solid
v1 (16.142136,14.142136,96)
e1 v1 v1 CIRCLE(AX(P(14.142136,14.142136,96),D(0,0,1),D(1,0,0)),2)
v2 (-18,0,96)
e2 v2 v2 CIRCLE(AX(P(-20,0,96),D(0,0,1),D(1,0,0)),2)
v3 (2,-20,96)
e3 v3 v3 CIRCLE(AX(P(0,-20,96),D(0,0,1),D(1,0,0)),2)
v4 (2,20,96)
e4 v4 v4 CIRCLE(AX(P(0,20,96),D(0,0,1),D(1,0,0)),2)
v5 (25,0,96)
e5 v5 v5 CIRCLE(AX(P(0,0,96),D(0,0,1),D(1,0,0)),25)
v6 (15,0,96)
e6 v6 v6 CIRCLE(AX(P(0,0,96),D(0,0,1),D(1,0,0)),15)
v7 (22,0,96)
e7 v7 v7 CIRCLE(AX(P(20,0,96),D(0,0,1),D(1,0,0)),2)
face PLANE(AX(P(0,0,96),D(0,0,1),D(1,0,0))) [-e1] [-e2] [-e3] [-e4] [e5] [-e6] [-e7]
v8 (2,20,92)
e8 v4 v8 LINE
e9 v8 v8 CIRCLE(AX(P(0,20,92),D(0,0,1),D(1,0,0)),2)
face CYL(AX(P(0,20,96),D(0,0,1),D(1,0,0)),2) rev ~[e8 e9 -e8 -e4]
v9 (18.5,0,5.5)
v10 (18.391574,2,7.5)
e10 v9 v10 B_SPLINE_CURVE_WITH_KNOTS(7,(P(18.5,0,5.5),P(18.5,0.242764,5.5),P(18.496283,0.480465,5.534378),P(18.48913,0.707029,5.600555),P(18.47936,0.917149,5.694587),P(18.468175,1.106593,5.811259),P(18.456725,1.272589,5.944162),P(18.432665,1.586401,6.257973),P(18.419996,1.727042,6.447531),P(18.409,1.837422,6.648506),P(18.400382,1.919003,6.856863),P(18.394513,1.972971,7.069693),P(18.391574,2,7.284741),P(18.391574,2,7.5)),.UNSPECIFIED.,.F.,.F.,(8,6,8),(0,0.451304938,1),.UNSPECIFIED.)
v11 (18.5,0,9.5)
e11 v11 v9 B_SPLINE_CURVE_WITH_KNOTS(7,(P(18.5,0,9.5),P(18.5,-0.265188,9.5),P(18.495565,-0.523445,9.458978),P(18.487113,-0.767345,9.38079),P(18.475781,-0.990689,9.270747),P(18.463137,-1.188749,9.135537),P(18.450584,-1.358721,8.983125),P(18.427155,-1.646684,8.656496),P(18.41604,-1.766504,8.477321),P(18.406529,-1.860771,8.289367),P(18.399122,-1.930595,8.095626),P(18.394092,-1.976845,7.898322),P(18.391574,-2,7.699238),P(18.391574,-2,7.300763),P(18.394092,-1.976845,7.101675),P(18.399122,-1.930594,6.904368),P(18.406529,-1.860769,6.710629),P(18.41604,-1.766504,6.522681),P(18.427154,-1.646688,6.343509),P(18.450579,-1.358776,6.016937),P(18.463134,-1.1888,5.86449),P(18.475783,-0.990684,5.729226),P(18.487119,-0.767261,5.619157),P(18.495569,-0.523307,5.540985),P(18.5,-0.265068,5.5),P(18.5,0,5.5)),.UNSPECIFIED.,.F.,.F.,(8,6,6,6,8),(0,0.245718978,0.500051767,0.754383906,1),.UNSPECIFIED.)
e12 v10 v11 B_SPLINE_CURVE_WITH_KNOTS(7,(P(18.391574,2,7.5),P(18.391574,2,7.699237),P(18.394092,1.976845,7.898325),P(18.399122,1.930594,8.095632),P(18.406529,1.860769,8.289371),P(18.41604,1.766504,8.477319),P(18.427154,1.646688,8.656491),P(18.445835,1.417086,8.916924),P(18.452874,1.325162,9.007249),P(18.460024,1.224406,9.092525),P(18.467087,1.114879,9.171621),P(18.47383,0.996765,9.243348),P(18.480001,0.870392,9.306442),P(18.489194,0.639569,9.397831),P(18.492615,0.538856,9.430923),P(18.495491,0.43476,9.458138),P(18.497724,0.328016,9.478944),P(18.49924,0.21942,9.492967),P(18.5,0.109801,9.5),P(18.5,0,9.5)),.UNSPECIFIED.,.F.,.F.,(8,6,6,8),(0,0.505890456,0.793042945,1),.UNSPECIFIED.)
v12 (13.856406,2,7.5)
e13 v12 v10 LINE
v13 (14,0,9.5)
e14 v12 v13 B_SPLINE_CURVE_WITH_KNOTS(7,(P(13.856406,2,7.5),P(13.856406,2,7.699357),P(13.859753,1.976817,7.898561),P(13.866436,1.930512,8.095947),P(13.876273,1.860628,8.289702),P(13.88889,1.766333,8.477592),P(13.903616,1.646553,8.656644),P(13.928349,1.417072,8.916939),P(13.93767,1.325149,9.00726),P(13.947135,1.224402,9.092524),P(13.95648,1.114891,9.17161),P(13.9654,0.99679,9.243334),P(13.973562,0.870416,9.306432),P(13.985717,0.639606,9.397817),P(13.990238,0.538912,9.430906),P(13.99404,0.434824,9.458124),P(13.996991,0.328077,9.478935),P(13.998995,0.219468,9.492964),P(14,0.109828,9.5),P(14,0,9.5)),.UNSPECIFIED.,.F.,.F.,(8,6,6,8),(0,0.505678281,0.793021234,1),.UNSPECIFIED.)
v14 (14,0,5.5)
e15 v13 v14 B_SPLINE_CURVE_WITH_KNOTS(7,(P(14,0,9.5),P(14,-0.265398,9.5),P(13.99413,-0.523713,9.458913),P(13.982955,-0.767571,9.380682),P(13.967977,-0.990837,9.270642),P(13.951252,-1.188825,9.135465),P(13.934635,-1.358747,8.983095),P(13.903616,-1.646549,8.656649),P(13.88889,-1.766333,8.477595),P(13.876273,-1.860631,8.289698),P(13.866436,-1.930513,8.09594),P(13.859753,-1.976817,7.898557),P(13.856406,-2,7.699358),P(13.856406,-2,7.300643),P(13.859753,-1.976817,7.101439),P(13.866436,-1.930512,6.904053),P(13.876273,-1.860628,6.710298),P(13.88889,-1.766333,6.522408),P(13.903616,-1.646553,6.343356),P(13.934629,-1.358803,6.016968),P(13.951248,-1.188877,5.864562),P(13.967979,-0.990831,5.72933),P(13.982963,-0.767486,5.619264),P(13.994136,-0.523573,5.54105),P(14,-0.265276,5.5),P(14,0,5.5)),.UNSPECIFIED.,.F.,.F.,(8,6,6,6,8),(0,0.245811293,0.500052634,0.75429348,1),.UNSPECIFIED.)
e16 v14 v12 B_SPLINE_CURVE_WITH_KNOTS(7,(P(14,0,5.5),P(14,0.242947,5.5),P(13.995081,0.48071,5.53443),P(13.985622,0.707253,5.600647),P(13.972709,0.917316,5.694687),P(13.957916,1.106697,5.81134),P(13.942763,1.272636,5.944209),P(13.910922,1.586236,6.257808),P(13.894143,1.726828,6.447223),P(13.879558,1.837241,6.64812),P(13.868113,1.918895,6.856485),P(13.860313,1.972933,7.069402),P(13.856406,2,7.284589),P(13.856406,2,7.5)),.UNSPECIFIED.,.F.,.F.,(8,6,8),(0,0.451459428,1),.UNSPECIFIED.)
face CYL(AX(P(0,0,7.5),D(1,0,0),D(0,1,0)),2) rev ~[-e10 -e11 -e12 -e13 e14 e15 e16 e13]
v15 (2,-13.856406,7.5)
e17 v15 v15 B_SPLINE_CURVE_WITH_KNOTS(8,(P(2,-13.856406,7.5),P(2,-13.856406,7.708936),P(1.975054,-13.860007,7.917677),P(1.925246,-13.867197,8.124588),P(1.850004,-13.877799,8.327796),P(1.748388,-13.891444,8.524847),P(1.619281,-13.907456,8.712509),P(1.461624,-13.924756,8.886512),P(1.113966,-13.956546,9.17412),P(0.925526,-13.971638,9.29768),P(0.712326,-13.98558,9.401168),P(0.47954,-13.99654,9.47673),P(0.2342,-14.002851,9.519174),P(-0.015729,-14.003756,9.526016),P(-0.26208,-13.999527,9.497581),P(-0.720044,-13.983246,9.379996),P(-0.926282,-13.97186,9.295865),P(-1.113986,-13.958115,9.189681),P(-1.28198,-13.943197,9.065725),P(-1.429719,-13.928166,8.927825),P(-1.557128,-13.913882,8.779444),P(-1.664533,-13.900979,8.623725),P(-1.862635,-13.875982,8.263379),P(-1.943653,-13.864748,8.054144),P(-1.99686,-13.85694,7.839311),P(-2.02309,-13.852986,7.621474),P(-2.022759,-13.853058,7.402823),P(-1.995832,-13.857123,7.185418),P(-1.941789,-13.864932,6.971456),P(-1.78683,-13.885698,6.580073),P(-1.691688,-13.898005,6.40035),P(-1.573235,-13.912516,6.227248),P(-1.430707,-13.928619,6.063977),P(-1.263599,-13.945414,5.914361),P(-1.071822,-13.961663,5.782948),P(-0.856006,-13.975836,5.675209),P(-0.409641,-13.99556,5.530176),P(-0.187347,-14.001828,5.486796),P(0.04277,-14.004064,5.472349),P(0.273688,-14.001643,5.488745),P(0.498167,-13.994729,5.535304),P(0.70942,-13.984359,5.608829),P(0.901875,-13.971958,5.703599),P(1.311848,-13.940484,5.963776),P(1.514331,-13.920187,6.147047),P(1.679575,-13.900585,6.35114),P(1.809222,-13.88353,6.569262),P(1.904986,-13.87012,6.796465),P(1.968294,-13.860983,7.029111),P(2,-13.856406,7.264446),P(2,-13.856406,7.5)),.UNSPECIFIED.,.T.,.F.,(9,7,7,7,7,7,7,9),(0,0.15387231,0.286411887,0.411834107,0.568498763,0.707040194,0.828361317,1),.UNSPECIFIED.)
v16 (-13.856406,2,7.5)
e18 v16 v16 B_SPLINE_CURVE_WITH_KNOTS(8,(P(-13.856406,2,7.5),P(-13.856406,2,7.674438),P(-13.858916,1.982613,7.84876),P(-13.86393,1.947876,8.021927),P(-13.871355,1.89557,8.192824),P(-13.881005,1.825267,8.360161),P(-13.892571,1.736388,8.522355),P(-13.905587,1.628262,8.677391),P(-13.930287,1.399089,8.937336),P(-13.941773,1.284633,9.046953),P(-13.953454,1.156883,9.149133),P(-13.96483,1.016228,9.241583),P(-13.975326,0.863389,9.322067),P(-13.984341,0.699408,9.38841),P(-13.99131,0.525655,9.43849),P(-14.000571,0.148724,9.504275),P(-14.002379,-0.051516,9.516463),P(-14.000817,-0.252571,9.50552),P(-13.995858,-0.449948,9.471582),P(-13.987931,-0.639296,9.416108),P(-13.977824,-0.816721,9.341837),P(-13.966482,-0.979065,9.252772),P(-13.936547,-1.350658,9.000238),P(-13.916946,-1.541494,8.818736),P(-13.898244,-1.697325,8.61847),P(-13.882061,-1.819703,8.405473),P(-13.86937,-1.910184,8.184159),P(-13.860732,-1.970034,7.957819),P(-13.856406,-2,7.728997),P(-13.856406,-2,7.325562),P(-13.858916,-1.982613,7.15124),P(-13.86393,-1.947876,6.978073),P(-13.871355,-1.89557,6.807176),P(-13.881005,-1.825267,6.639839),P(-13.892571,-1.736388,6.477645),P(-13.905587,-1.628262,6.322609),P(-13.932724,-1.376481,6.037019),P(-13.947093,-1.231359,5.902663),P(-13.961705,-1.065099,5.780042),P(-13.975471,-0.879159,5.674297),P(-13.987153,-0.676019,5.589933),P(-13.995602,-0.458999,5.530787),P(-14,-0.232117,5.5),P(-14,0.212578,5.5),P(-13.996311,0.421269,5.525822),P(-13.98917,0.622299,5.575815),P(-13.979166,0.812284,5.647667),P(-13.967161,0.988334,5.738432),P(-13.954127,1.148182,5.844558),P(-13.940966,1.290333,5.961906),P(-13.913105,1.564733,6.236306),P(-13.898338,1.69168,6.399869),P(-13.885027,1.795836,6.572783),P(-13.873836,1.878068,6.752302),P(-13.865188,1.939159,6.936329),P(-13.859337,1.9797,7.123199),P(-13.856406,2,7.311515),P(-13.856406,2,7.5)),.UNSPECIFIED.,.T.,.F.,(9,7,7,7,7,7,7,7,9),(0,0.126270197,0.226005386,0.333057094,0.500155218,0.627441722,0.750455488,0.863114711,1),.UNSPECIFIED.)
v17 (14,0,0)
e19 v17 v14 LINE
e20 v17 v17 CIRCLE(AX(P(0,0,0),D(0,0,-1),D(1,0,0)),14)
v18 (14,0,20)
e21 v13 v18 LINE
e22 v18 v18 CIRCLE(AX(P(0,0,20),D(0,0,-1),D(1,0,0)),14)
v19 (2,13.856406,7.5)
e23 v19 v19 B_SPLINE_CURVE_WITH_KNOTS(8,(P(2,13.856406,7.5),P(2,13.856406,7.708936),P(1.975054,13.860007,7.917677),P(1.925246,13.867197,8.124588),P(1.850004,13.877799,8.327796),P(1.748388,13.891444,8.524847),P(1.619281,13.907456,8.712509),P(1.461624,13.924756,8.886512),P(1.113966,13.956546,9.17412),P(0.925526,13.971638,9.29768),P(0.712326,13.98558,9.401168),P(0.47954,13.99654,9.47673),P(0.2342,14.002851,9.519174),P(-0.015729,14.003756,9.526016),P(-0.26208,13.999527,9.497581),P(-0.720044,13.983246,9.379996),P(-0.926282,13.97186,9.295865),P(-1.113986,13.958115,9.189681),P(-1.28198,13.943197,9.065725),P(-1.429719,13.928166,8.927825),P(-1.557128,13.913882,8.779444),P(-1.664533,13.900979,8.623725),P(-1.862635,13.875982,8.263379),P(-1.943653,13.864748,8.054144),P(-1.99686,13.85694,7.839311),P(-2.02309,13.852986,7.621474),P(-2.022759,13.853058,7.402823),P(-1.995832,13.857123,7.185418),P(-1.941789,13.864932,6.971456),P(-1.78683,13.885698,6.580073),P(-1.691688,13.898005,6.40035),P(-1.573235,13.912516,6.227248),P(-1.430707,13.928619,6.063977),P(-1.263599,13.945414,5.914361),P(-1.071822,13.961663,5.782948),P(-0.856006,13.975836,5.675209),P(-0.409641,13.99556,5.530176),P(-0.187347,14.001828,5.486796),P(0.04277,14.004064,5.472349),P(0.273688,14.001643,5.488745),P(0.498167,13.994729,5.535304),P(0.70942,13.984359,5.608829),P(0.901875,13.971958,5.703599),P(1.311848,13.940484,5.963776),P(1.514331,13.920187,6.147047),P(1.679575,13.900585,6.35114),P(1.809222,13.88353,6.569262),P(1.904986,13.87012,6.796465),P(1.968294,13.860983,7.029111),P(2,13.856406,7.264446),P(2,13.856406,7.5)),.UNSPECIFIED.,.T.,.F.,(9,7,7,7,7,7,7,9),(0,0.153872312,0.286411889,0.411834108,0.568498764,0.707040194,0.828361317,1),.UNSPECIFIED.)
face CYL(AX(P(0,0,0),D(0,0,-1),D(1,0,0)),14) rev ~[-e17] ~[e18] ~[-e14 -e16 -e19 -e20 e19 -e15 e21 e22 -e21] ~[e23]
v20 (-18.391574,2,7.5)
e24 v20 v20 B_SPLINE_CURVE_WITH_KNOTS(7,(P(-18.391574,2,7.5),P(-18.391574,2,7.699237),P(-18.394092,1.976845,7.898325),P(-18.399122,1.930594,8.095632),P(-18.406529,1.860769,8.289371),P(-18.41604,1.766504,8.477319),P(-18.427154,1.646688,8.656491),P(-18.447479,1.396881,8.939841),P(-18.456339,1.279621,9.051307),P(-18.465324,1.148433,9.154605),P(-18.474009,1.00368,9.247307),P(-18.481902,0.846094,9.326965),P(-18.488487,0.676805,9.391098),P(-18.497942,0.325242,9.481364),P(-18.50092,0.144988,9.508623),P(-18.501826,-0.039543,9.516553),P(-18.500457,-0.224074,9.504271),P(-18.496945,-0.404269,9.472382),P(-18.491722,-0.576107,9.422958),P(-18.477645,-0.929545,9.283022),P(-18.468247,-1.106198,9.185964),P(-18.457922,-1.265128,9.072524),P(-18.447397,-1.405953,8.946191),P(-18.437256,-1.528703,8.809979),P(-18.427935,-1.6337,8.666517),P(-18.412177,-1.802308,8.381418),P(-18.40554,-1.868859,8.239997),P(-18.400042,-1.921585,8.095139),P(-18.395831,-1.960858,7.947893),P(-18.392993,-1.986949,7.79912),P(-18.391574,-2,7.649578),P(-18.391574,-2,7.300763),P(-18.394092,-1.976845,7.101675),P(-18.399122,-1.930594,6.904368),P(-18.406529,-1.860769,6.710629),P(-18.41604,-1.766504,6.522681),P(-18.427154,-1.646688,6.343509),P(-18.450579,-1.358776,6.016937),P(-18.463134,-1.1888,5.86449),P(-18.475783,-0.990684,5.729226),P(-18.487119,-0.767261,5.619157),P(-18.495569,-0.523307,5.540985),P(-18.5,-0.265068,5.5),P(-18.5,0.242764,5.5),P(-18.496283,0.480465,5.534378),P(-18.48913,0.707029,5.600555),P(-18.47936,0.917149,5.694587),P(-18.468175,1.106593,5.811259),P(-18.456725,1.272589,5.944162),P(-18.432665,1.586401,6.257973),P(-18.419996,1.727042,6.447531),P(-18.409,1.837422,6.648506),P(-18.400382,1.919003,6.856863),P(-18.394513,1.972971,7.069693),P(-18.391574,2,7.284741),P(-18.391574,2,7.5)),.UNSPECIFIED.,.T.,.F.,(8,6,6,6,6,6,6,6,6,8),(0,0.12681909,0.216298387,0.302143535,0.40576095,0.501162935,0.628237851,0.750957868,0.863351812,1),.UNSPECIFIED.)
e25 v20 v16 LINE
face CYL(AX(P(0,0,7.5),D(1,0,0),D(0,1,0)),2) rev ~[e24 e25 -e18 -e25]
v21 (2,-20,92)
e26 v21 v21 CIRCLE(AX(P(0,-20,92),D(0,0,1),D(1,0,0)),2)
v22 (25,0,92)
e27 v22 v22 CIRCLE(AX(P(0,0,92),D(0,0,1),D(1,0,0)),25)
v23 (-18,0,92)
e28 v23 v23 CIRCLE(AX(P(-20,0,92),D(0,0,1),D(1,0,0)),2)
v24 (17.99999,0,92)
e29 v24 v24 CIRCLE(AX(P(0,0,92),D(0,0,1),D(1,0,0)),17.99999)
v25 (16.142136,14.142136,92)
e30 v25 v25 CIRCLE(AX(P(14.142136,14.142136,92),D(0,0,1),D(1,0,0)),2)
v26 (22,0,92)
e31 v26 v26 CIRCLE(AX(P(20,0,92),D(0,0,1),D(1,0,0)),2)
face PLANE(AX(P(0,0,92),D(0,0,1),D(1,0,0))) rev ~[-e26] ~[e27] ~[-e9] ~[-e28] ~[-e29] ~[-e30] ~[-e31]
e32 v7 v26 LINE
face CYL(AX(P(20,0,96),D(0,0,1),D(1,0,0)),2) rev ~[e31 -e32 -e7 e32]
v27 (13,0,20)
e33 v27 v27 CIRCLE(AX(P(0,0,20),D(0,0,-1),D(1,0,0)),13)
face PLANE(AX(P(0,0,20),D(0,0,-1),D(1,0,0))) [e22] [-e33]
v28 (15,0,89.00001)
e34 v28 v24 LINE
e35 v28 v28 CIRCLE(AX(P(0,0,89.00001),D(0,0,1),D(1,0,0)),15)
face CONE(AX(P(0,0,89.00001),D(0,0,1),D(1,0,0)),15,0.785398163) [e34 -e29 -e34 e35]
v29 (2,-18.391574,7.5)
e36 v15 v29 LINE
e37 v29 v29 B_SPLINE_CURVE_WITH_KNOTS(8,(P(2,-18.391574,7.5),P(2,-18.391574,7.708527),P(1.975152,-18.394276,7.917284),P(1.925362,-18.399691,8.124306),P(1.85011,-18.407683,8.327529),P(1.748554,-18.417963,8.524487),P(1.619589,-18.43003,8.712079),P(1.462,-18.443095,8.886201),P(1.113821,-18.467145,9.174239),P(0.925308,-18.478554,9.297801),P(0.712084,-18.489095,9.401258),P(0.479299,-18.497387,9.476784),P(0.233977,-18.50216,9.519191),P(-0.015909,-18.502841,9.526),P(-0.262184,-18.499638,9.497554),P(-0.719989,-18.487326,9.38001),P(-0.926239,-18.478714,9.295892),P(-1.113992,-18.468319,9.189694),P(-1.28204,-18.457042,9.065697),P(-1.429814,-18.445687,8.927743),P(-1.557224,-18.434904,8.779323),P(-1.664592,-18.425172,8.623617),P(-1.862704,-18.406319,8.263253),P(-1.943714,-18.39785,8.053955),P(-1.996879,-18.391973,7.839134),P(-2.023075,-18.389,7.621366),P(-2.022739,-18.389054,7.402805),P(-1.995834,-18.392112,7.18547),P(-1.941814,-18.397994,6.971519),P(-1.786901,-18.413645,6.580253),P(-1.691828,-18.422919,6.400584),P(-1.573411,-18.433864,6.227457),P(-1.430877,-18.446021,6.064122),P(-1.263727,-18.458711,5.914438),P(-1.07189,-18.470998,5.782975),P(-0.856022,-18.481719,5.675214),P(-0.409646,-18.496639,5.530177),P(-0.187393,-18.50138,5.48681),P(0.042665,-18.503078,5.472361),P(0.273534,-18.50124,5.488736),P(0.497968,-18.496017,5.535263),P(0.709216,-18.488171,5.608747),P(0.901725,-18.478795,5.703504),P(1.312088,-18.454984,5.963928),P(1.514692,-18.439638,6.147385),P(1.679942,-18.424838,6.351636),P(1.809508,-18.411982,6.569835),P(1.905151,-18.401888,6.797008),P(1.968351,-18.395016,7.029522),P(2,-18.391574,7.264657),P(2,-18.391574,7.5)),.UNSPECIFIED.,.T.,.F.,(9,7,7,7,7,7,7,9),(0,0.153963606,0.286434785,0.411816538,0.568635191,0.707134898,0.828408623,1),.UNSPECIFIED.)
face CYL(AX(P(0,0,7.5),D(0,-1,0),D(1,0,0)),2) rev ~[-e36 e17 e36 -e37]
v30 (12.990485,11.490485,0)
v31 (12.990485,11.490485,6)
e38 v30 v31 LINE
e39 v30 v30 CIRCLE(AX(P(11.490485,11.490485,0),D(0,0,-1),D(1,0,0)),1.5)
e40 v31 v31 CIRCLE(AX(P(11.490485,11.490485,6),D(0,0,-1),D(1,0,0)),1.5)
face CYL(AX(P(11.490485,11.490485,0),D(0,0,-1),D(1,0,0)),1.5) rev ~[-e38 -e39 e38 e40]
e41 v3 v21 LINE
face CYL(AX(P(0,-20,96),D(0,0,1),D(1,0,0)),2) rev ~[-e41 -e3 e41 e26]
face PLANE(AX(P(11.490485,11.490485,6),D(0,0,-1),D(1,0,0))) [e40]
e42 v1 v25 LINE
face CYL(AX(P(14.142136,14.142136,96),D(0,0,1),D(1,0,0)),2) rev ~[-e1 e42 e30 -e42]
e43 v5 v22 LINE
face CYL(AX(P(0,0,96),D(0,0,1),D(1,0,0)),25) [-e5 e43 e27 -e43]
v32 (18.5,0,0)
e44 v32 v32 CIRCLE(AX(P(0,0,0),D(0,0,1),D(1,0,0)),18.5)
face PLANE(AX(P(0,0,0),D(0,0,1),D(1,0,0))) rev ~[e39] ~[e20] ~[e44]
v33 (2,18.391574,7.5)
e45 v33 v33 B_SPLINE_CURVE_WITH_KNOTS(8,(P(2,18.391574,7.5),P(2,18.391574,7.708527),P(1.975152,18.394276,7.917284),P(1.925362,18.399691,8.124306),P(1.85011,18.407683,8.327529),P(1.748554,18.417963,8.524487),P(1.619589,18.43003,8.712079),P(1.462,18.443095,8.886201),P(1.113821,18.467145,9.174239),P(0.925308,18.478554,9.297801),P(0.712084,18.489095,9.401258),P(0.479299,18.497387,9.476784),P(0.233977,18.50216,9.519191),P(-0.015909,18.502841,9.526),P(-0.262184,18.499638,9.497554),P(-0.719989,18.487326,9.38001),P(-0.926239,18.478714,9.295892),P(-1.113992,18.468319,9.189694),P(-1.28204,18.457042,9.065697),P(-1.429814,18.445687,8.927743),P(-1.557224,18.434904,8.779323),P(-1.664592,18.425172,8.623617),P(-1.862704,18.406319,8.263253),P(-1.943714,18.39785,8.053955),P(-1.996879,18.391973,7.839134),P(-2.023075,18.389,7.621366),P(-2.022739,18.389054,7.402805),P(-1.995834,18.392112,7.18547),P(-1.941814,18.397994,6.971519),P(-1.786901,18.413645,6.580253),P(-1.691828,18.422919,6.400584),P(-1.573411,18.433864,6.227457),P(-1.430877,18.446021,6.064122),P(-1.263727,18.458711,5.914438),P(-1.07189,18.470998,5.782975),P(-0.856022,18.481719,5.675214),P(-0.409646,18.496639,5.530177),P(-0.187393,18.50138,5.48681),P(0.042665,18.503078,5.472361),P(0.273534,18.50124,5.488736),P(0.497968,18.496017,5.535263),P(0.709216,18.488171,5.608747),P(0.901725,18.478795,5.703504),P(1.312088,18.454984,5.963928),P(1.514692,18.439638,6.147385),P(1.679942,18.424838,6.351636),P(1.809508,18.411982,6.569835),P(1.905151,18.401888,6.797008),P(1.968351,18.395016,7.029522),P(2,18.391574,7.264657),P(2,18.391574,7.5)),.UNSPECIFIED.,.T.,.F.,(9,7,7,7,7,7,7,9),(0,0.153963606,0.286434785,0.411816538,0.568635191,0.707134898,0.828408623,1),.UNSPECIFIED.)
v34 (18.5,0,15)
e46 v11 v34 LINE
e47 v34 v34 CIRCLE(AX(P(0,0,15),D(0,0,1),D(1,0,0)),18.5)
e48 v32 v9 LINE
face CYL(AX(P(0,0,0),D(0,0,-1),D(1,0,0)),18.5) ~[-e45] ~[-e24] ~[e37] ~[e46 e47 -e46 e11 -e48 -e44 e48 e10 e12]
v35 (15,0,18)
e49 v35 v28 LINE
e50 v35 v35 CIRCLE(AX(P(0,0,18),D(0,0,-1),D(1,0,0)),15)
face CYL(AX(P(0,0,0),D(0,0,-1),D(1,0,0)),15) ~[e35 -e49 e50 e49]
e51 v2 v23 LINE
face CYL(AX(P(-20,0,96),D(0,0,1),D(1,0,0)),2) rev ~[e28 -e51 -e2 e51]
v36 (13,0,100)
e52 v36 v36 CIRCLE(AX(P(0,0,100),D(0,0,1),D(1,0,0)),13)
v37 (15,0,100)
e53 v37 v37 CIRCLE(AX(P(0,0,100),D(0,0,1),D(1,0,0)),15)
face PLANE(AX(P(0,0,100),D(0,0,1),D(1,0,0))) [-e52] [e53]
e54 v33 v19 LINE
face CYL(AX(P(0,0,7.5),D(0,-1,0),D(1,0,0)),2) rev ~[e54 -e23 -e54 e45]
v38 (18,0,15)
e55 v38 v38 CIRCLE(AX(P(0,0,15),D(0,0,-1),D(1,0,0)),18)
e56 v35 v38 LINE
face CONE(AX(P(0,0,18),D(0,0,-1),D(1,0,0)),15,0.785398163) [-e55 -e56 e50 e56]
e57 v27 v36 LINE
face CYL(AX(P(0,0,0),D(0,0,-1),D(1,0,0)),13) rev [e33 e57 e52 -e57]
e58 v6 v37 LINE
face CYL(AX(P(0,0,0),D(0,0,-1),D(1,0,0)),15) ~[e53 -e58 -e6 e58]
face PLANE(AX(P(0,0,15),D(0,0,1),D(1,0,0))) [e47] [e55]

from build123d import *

# Parameters (mm, degrees)
F0_R      = 15
F0_R_2    = 13
F1_DEPTH  = 100
F3_R      = 25
F3_R_2    = 15
F4_DEPTH  = 4
F5_R      = 2
F6_DEPTH  = 96.001
F7_R      = 18.5
F7_R_2    = 13
F8_DEPTH  = 15
F9_R      = 2
F10_DEPTH = 50
F11_R     = 2
F12_DEPTH = 50
F13_SIZE  = 2.99999
F14_SIZE  = 3
F15_R     = 14
F16_DEPTH = 20
F17_R     = 2
F18_DEPTH = 25
F19_R     = 1.5
F20_DEPTH = 6


# Not quite as in the source:
# - a fillet or chamfer is up to 0.001 mm smaller than in the source, because OpenCascade refuses the exact size


with BuildPart() as f1:
    # F0 (on Top) → F1 (new body)
    with BuildSketch(Plane.XY):
        Circle(F0_R)
        Circle(F0_R_2, mode=Mode.SUBTRACT)
    extrude(amount=F1_DEPTH)

    # F3 (on offset) → F4 (join)
    with BuildSketch(Plane.XY.offset(96)):
        Circle(F3_R)
        Circle(F3_R_2, mode=Mode.SUBTRACT)
    extrude(amount=-F4_DEPTH)

    # F5 (on face) → F6 (cut, through all)
    with BuildSketch(Plane.XY.offset(96)):
        with Locations((0, 20)):
            Circle(F5_R)
        with Locations((-20, 0)):
            Circle(F5_R)
        with Locations((0, -20)):
            Circle(F5_R)
        with Locations((20, 0)):
            Circle(F5_R)
    extrude(amount=-F6_DEPTH, mode=Mode.SUBTRACT)

    # F7 (on Top) → F8 (join)
    with BuildSketch(Plane.XY):
        Circle(F7_R)
        Circle(F7_R_2, mode=Mode.SUBTRACT)
    extrude(amount=F8_DEPTH)

    # F9 (on Right) → F10 (cut, symmetric)
    with BuildSketch(Plane.YZ):
        with Locations((0, 7.5)):
            Circle(F9_R)
    extrude(amount=F10_DEPTH, both=True, mode=Mode.SUBTRACT)

    # F11 (on Front) → F12 (cut, symmetric)
    with BuildSketch(Plane.XZ):
        with Locations((0, 7.5)):
            Circle(F11_R)
    extrude(amount=F12_DEPTH, both=True, mode=Mode.SUBTRACT)

    # F13 (size 3 in the source; OpenCascade refuses exactly that, so slightly less here)
    f13_edges = [f1.edges().sort_by_distance(p)[0] for p in [
        (-15, 0, 92),
    ]]
    chamfer(f13_edges, length=F13_SIZE)

    # F14
    f14_edges = [f1.edges().sort_by_distance(p)[0] for p in [
        (-15, 0, 15),
    ]]
    chamfer(f14_edges, length=F14_SIZE)

    # F15 (on face) → F16 (cut)
    with BuildSketch(Plane(origin=(0, 0, 0), x_dir=(1, 0, 0), z_dir=(0, 0, -1))):
        Circle(F15_R)
    extrude(amount=-F16_DEPTH, mode=Mode.SUBTRACT)

    # F17 (on face) → F18 (cut)
    with BuildSketch(Plane.XY.offset(96)):
        with Locations((14.1421356237, 14.1421356237)):
            Circle(F17_R)
    extrude(amount=-F18_DEPTH, mode=Mode.SUBTRACT)

    # F19 (on face) → F20 (cut)
    with BuildSketch(Plane(origin=(0, 0, 0), x_dir=(1, 0, 0), z_dir=(0, 0, -1))):
        with Locations((11.4904851943, -11.4904851943)):
            Circle(F19_R)
    extrude(amount=-F20_DEPTH, mode=Mode.SUBTRACT)


solid = f1.part
